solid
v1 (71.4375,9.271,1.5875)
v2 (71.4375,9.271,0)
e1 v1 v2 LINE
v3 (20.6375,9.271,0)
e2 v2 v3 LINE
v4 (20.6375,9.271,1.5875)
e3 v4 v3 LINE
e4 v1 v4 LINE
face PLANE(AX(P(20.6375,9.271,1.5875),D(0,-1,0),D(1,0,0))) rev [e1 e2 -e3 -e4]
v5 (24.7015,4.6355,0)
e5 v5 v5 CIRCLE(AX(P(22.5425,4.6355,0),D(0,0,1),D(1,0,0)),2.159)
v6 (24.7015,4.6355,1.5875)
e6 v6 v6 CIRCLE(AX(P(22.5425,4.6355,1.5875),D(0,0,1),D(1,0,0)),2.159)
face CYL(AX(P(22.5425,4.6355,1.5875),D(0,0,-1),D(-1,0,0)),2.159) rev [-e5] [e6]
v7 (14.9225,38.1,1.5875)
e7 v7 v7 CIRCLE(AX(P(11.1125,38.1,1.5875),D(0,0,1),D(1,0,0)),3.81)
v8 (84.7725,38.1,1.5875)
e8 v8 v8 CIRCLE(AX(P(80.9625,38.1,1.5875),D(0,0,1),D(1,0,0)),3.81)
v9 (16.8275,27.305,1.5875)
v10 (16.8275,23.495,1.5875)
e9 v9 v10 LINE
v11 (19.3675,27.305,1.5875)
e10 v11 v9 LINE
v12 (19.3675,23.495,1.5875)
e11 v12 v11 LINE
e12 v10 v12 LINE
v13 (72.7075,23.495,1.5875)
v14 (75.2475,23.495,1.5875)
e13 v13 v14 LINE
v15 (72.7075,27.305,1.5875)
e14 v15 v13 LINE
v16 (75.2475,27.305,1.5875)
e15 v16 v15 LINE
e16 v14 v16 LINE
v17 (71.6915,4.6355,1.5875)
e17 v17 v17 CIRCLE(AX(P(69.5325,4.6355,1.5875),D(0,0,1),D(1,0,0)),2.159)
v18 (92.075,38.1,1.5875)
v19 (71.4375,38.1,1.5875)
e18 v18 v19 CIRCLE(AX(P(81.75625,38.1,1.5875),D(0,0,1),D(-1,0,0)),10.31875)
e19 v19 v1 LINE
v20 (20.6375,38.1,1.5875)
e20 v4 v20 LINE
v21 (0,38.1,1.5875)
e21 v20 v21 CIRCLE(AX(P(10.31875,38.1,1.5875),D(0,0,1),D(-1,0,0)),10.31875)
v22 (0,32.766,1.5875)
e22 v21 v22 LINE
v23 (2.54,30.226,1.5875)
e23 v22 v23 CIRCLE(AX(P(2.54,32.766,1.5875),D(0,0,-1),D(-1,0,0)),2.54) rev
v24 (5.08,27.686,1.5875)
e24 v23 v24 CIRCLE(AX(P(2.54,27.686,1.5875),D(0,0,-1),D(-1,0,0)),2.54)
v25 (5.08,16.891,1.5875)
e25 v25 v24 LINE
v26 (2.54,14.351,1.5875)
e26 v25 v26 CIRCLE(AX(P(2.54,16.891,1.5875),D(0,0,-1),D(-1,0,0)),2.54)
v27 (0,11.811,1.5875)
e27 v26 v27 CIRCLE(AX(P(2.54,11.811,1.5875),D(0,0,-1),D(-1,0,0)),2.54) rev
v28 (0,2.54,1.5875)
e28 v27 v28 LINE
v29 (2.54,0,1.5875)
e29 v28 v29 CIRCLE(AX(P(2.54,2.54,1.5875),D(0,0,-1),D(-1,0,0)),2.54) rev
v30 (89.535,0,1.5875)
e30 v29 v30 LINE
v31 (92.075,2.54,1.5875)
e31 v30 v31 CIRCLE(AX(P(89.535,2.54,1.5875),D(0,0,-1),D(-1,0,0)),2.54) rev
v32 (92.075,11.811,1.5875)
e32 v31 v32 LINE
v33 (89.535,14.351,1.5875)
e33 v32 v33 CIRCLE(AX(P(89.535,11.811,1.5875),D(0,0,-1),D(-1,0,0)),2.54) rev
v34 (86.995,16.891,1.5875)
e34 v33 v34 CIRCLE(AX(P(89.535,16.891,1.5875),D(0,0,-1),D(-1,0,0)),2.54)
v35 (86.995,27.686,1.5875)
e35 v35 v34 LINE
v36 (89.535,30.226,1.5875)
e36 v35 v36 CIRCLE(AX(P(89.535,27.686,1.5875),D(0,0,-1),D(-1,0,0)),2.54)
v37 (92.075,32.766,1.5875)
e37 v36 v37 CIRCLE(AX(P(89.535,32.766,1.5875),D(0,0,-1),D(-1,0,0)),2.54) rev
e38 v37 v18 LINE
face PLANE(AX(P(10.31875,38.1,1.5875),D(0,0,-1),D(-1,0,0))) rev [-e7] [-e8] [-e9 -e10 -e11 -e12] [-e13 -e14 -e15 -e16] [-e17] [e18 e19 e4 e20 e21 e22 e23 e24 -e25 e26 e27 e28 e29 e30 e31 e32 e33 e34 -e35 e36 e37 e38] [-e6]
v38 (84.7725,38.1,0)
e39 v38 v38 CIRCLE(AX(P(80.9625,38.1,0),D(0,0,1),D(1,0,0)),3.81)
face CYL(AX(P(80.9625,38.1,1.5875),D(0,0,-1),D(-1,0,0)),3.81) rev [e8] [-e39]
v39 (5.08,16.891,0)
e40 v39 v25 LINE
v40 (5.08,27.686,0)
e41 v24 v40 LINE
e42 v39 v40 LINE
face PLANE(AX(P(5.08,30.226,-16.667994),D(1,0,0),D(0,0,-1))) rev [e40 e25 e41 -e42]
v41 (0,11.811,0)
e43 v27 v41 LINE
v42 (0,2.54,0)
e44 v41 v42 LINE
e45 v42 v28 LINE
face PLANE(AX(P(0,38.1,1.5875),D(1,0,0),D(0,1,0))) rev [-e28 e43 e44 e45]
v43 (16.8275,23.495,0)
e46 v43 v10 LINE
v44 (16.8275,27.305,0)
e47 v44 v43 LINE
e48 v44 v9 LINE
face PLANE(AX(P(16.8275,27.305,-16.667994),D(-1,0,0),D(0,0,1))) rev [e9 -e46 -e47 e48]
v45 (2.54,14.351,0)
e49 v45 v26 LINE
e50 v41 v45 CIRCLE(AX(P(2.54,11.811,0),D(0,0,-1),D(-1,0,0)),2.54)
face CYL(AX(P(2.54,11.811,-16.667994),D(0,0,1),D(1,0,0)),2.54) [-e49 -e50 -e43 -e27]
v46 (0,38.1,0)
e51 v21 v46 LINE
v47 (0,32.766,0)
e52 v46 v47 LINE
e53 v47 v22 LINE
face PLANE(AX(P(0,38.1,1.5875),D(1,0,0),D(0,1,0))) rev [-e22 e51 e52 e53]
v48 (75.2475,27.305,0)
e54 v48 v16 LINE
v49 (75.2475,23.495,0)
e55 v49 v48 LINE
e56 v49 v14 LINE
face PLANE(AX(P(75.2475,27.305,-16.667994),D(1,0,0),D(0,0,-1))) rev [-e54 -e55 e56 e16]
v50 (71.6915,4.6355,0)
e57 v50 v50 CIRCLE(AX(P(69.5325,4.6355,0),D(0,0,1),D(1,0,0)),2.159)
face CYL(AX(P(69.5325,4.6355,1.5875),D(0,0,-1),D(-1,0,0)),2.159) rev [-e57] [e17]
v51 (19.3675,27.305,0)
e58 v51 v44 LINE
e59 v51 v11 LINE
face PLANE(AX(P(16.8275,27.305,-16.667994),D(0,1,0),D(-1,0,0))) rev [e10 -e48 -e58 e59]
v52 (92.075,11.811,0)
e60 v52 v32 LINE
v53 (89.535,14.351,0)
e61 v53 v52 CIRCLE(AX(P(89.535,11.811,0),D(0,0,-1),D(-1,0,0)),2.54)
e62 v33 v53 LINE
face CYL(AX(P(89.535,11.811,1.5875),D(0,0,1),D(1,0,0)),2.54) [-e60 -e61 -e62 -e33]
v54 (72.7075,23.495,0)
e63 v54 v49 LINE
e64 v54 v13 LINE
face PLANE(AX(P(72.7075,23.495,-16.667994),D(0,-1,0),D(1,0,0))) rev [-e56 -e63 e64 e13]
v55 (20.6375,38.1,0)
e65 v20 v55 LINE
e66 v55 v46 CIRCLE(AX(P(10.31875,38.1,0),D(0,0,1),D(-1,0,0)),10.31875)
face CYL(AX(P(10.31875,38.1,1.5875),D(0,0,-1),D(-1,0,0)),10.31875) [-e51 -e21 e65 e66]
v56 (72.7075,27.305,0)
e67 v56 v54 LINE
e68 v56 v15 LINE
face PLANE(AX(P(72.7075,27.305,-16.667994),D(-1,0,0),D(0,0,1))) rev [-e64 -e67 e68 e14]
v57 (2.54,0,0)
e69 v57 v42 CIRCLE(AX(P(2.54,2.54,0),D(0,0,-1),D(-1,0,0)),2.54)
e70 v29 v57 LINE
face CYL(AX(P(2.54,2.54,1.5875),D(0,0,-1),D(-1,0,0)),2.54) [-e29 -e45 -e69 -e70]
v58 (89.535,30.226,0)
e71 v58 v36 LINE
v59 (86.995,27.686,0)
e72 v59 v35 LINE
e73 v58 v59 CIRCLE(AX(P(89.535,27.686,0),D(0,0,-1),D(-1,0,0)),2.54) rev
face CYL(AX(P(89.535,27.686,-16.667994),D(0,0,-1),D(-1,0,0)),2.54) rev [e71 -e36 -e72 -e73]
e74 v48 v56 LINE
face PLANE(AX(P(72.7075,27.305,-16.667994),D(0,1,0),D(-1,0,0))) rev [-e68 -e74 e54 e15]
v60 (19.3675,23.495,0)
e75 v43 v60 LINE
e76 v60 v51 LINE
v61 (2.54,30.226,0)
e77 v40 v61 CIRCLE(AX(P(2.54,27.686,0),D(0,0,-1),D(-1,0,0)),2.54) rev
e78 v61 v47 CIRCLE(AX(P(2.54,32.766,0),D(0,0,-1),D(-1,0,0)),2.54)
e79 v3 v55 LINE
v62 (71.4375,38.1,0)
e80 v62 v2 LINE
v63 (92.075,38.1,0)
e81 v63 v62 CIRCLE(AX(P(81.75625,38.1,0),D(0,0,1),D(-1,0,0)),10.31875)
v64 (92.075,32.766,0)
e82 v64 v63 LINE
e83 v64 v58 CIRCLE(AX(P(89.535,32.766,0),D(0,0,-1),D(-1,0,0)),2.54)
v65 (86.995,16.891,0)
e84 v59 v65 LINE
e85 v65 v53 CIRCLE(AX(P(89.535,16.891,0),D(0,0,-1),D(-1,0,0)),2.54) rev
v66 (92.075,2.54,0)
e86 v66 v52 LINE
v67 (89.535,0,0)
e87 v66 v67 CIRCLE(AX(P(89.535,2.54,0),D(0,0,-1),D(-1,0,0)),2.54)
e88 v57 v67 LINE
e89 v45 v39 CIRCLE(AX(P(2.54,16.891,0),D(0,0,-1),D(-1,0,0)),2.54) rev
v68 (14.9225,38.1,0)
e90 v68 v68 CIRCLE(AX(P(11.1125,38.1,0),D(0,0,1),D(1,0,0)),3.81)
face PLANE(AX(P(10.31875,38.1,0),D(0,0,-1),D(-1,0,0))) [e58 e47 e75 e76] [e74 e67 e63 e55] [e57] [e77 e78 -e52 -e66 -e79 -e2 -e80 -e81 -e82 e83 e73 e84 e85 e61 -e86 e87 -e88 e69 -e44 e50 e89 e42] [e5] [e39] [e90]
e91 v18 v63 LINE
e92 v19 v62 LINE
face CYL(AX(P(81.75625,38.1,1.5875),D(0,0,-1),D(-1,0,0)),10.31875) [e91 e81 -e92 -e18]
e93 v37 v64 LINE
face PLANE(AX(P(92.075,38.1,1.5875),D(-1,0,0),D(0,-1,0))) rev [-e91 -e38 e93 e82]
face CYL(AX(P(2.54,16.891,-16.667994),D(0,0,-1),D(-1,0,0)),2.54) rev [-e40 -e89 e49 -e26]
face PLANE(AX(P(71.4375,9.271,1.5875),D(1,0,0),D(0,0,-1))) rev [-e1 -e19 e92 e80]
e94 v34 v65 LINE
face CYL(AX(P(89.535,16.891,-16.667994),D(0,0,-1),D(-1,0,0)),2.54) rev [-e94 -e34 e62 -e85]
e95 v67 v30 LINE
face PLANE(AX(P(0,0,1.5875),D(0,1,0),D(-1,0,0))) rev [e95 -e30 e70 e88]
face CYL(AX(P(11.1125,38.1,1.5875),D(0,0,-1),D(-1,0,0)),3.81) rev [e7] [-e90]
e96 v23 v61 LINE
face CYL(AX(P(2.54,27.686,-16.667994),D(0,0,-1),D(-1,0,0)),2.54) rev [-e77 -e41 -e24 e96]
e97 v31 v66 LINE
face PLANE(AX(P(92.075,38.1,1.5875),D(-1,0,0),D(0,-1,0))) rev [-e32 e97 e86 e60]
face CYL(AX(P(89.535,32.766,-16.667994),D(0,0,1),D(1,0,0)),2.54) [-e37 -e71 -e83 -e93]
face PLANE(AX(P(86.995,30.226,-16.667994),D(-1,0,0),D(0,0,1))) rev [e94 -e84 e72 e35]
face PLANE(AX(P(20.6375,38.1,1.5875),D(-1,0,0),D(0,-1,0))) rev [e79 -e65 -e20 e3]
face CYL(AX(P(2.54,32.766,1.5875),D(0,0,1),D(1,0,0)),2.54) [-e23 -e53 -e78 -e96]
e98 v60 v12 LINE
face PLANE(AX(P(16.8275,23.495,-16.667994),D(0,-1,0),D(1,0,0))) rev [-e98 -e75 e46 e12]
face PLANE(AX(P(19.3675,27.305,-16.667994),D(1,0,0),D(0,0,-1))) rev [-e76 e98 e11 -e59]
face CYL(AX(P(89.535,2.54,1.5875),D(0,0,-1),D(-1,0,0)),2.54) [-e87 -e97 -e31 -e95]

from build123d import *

# Parameters (mm, degrees)
SKETCH1_R           = 2.159
SKETCH1_R_2         = 3.81
BOSS_EXTRUDE1_DEPTH = 1.5875
FILLET1_R           = 2.54
SKETCH2_W           = 5.08
SKETCH2_H           = 15.875
SKETCH2_W_2         = 2.54
SKETCH2_H_2         = 3.81
CUT_EXTRUDE1_DEPTH  = 1.5875
FILLET2_START       = -1
FILLET2_DEPTH       = 4
FILLET2_2_DEPTH     = 1.5875


with BuildPart() as part:
    # Sketch1 → Boss-Extrude1 (new body)
    with BuildSketch(Plane.XY):
        with BuildLine():
            Line((0, 38.1), (0, 0))
            Line((0, 0), (92.075, 0))
            Line((92.075, 0), (92.075, 38.1))
            ThreePointArc((92.075, 38.1), (81.75625, 48.41875), (71.4375, 38.1))
            Line((71.4375, 38.1), (71.4375, 9.271))
            Line((71.4375, 9.271), (20.6375, 9.271))
            Line((20.6375, 9.271), (20.6375, 38.1))
            ThreePointArc((20.6375, 38.1), (10.31875, 48.41875), (0, 38.1))
        make_face()
        with Locations((22.5425, 4.6355)):
            Circle(SKETCH1_R, mode=Mode.SUBTRACT)
        with Locations((69.5325, 4.6355)):
            Circle(SKETCH1_R, mode=Mode.SUBTRACT)
        with Locations((11.1125, 38.1)):
            Circle(SKETCH1_R_2, mode=Mode.SUBTRACT)
        with Locations((80.9625, 38.1)):
            Circle(SKETCH1_R_2, mode=Mode.SUBTRACT)
    extrude(amount=BOSS_EXTRUDE1_DEPTH)

    # Fillet1
    fillet1_edges = [part.edges().sort_by_distance(p)[0] for p in [
        (92.075, 0, 0.79375),
        (0, 0, 0.79375),
    ]]
    fillet(fillet1_edges, radius=FILLET1_R)

    # Sketch2 → Cut-Extrude1 (cut)
    with BuildSketch(Plane.XY.offset(1.5875)):
        with Locations((89.535, 22.2885)):
            Rectangle(SKETCH2_W, SKETCH2_H)
        with Locations((2.54, 22.2885)):
            Rectangle(SKETCH2_W, SKETCH2_H)
        with Locations((18.0975, 25.4)):
            Rectangle(SKETCH2_W_2, SKETCH2_H_2)
        with Locations((73.9775, 25.4)):
            Rectangle(SKETCH2_W_2, SKETCH2_H_2)
    extrude(amount=-CUT_EXTRUDE1_DEPTH, mode=Mode.SUBTRACT)

    # Fillet2: read off the stored shape, not the designer's step
    # Fillet2 outline → Fillet2 (cut)
    with BuildSketch(Plane.XY.offset(FILLET2_START)):
        with BuildLine():
            Line((92.075, 14.351), (89.535, 14.351))
            ThreePointArc((89.535, 14.351), (91.331051224, 13.607051224), (92.075, 11.811))
            Line((92.075, 11.811), (92.075, 14.351))
        make_face()
        with BuildLine():
            ThreePointArc((92.075, 32.766), (91.331051224, 30.969948776), (89.535, 30.226))
            Line((89.535, 30.226), (92.075, 30.226))
            Line((92.075, 30.226), (92.075, 32.766))
        make_face()
        with BuildLine():
            Line((0, 30.226), (2.54, 30.226))
            ThreePointArc((2.54, 30.226), (0.743948776, 30.969948776), (0, 32.766))
            Line((0, 32.766), (0, 30.226))
        make_face()
        with BuildLine():
            ThreePointArc((0, 11.811), (0.743948776, 13.607051224), (2.54, 14.351))
            Line((2.54, 14.351), (0, 14.351))
            Line((0, 14.351), (0, 11.811))
        make_face()
    extrude(amount=FILLET2_DEPTH, mode=Mode.SUBTRACT)

    # Fillet2 2 outline → Fillet2 2 (add)
    with BuildSketch(Plane.XY):
        with BuildLine():
            ThreePointArc((89.535, 14.351), (87.738948776, 15.094948776), (86.995, 16.891))
            Line((86.995, 16.891), (86.995, 14.351))
            Line((86.995, 14.351), (89.535, 14.351))
        make_face()
        with BuildLine():
            ThreePointArc((86.995, 27.686), (87.738948776, 29.482051224), (89.535, 30.226))
            Line((89.535, 30.226), (86.995, 30.226))
            Line((86.995, 30.226), (86.995, 27.686))
        make_face()
        with BuildLine():
            ThreePointArc((2.54, 30.226), (4.336051224, 29.482051224), (5.08, 27.686))
            Line((5.08, 27.686), (5.08, 30.226))
            Line((5.08, 30.226), (2.54, 30.226))
        make_face()
        with BuildLine():
            ThreePointArc((5.08, 16.891), (4.336051224, 15.094948776), (2.54, 14.351))
            Line((2.54, 14.351), (5.08, 14.351))
            Line((5.08, 14.351), (5.08, 16.891))
        make_face()
    extrude(amount=FILLET2_2_DEPTH)


solid = part.part
